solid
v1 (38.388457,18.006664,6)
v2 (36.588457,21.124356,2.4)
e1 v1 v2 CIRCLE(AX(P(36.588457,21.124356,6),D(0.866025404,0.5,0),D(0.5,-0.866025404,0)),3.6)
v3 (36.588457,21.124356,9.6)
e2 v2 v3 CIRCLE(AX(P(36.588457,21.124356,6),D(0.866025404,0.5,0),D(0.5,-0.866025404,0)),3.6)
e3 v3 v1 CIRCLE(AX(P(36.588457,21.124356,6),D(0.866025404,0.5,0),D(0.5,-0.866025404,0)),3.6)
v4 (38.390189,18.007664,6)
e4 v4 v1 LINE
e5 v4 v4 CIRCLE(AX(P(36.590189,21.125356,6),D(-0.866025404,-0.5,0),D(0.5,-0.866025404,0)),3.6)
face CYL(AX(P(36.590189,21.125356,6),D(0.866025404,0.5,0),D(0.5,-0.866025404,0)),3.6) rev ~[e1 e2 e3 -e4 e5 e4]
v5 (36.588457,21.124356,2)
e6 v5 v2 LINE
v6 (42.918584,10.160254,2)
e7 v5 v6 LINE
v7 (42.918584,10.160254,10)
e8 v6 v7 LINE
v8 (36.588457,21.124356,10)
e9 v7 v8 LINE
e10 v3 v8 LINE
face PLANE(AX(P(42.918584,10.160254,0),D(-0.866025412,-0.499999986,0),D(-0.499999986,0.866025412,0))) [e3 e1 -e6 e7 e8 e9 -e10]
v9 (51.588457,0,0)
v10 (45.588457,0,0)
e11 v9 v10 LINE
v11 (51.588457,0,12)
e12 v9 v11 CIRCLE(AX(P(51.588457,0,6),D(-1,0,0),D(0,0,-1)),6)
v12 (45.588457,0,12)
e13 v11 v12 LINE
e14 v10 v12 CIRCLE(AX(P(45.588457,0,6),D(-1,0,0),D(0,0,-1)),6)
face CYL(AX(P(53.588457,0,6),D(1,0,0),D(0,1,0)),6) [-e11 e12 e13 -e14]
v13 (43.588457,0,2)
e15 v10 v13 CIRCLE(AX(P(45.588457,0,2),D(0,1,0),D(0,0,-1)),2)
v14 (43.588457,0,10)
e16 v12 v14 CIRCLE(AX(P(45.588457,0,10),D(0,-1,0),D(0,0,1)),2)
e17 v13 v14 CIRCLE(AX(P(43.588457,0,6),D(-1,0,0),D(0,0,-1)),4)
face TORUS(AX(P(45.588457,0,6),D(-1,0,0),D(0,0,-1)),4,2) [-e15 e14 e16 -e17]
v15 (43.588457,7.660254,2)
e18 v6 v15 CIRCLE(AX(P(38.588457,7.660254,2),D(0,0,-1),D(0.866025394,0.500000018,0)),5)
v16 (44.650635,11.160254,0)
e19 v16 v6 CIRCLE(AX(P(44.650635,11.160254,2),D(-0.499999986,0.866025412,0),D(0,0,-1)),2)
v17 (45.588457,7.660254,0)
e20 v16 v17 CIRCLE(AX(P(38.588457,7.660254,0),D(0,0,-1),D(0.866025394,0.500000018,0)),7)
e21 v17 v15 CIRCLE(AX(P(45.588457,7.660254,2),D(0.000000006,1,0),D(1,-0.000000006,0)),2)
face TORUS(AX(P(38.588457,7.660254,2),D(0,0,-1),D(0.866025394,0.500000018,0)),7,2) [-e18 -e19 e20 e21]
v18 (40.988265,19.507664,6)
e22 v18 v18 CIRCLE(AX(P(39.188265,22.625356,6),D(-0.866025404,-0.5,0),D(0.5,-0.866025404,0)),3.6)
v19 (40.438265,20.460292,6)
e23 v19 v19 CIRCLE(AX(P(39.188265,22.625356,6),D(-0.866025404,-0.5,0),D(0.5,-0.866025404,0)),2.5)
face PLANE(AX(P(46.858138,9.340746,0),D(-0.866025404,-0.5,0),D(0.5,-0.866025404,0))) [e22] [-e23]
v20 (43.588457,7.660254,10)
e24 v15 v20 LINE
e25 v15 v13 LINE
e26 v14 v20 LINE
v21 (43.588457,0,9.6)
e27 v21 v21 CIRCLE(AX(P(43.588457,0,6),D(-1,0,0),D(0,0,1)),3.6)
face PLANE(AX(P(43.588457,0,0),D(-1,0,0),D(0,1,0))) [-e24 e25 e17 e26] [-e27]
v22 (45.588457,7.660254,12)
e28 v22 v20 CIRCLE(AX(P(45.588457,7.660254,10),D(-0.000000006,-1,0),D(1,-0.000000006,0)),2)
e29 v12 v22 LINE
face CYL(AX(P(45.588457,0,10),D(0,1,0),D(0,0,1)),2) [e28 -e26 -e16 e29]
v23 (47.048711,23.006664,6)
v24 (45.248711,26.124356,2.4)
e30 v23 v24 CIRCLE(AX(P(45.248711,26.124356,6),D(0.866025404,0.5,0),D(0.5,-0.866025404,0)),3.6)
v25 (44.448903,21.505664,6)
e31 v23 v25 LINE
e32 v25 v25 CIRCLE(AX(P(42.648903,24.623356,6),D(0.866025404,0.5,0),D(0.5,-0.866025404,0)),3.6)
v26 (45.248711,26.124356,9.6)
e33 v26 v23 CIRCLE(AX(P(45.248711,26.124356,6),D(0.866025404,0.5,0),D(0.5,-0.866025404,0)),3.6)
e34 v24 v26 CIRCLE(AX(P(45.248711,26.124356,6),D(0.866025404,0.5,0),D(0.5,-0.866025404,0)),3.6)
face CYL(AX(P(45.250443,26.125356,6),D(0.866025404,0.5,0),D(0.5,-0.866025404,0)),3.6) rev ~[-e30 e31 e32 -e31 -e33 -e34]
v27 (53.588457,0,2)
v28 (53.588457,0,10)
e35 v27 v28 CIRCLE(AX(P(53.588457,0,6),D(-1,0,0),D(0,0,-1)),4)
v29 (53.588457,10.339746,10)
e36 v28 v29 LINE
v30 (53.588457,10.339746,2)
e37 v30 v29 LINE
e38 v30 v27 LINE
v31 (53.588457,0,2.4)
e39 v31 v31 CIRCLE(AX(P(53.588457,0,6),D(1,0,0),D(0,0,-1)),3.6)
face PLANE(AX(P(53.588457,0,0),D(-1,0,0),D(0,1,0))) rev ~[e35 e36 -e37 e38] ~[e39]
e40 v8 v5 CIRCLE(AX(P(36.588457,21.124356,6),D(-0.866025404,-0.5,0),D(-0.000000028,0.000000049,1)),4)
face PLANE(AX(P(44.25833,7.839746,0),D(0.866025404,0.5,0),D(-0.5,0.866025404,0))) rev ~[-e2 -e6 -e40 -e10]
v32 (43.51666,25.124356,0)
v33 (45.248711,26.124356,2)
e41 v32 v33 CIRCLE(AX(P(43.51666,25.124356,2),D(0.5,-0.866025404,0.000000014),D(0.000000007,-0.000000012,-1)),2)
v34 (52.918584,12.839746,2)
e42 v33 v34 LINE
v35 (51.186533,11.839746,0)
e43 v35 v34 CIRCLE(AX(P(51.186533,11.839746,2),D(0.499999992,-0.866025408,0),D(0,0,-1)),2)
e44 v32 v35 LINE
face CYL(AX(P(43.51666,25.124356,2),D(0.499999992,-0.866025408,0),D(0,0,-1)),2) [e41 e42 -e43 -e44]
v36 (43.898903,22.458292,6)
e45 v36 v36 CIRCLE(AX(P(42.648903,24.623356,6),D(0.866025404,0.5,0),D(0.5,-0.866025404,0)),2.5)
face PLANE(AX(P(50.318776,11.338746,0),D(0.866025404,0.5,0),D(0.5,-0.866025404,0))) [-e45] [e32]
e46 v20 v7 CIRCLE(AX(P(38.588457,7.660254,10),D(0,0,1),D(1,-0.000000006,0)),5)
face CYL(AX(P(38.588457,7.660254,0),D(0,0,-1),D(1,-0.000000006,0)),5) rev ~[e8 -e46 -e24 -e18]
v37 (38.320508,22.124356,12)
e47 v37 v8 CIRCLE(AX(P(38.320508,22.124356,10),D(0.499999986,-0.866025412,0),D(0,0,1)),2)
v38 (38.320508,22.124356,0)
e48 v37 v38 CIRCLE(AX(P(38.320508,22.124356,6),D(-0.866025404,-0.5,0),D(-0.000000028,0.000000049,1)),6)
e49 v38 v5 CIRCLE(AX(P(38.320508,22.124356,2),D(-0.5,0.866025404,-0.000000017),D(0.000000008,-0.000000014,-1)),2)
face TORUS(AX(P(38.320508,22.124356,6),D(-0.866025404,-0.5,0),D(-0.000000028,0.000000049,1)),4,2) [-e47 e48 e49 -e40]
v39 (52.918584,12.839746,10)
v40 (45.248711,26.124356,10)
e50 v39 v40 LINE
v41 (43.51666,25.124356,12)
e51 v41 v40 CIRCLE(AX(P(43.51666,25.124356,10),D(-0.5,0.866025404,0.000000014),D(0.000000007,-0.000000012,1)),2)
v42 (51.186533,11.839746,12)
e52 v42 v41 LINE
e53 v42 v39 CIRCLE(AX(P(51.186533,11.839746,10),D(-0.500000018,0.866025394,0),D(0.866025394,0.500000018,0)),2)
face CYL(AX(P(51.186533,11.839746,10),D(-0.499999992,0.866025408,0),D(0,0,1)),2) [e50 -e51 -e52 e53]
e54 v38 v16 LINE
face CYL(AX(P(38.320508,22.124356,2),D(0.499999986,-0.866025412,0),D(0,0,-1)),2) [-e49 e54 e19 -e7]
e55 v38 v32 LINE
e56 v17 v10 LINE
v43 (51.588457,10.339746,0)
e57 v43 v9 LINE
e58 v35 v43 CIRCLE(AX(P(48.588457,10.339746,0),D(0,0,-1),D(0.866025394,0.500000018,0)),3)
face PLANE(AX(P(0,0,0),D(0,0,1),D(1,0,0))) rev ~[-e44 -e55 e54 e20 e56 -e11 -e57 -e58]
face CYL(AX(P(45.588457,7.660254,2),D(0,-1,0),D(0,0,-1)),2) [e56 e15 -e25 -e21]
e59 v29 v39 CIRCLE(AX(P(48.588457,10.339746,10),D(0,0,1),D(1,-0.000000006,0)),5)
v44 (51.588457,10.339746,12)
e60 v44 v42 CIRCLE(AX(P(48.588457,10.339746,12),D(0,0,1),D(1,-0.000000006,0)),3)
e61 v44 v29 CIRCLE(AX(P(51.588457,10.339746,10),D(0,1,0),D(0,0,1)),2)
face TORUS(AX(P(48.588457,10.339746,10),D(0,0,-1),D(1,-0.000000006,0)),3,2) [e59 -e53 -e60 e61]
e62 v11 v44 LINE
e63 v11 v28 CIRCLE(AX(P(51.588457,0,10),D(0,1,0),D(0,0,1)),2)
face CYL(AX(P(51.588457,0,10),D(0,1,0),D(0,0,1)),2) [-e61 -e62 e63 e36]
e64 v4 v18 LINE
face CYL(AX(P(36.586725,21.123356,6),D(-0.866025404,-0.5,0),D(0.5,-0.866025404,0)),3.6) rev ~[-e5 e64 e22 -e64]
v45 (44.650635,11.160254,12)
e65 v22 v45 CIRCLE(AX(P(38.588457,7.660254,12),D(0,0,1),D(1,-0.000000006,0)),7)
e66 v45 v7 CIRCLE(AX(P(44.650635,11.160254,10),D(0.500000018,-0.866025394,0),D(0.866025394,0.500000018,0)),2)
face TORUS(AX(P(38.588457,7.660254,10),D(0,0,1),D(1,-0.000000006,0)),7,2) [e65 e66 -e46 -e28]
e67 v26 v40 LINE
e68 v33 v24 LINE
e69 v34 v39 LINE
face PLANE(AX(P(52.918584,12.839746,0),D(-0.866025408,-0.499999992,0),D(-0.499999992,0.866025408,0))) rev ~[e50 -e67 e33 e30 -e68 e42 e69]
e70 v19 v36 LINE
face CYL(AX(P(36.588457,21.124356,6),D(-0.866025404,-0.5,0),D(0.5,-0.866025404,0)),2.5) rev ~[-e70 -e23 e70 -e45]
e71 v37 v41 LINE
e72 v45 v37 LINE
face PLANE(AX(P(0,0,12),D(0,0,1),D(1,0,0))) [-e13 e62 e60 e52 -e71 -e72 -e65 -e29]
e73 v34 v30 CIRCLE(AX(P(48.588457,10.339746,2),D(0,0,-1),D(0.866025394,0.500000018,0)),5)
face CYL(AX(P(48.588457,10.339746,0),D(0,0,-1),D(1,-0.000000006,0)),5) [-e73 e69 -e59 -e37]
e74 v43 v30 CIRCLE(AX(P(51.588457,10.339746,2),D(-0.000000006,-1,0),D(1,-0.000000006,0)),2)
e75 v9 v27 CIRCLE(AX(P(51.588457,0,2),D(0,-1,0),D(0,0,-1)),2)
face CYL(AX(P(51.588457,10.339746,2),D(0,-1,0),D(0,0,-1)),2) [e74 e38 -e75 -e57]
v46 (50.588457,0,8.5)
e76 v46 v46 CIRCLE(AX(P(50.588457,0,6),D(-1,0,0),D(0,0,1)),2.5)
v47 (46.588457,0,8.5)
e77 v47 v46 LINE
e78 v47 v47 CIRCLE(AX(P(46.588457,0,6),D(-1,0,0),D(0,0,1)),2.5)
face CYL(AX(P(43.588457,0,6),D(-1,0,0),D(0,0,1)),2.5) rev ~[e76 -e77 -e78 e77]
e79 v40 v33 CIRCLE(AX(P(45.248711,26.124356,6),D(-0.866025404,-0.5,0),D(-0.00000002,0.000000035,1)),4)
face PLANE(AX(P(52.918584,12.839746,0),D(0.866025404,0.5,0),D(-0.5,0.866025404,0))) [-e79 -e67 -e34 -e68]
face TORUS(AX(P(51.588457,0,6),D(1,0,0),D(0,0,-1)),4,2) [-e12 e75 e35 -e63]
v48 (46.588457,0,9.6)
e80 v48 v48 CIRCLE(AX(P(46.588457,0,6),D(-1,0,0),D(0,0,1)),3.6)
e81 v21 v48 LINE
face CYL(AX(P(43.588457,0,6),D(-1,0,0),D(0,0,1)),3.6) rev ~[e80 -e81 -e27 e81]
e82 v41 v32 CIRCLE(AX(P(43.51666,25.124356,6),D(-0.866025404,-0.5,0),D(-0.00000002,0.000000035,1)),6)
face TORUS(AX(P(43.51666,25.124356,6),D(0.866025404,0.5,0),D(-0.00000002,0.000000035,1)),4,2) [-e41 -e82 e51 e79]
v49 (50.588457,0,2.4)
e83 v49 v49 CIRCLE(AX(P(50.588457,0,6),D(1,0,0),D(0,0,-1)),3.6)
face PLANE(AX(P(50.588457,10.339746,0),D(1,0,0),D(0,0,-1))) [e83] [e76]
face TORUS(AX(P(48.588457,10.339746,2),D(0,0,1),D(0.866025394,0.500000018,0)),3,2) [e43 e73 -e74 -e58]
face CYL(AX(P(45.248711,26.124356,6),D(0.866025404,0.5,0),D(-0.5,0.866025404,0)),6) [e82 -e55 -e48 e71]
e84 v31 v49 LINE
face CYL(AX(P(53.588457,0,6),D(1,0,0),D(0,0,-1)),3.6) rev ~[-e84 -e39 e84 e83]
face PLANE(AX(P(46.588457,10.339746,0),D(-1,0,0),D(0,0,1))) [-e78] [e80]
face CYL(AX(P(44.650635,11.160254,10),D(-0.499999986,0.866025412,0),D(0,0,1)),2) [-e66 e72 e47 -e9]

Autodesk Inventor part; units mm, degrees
ref_plane "YZ Plane" through (0, 0, 0) normal (1, 0, 0) x (0, 1, 0)
sketch "Sketch1" plane through (0, 0, 0) normal (0, 0, 1) x (1, 0, 0)
  line L0 (53.588457, 0) -> (0, 0)
  line L1 (0, 0) -> (60.328682, 34.830781)
  line L2 (43.588457, 0) -> (43.588457, 7.660254)
  line L3 (42.918584, 10.160254) -> (36.588457, 21.124356)
  line L4 (53.588457, 0) -> (53.588457, 10.339746)
  line L5 (52.918584, 12.839746) -> (45.248711, 26.124356)
  arc A0 (43.588457, 7.660254) -> (42.918584, 10.160254) centre (38.588457, 7.660254) ccw
  arc A1 (53.588457, 10.339746) -> (52.918584, 12.839746) centre (48.588457, 10.339746) ccw
  line L6 (45.248711, 26.124356) -> (36.588457, 21.124356)
  line L7 (45.248711, 26.124356) -> (52.918584, 12.839746)
  line L8 (36.588457, 21.124356) -> (42.918584, 10.160254)
  line L9 (43.588457, 0) -> (53.588457, 0)
  line L10 (53.588457, 0) -> (53.588457, 10.339746)
  line L11 (43.588457, 0) -> (53.588457, 0)
  line L12 (53.588457, 0) -> (53.588457, 10.339746)
  line L13 (52.918584, 12.839746) -> (45.248711, 26.124356)
  line L14 (45.248711, 26.124356) -> (36.588457, 21.124356)
  line L15 (36.588457, 21.124356) -> (42.918584, 10.160254)
  line L16 (43.588457, 7.660254) -> (43.588457, 0)
  point P0 (43.30127, 25)
  point P1 (43.588457, 9)
  dimension "d37" = 30
  dimension "d38" = 10
  dimension "d39" = 10
  dimension "d40" = 0
  dimension "d41" = 0
  dimension "d42" = 9
  dimension "d43" = 14
  dimension "d44" = 150
  dimension "d45" = 5
extrude "Extrusion1" add sketch "Sketch1" along normal blind 12 contours L0 L2 A0 L3 L1 L5 A1 L4
ref_plane "Work Plane1" through (52.918584, 12.839746, 0) normal (0.8660254, 0.5, 0) x (-0.5, 0.8660254, 0)
sketch "Sketch2" plane through (52.918584, 12.839746, 0) normal (0.8660254, 0.5, 0) x (-0.5, 0.8660254, 0)
  circle A0 centre (15.339746, 6) radius 6
  line L0 (15.339746, 0) -> (15.339746, 12)
  line L1 (0, 12) -> (15.339746, 12)
  dimension "d5" = 12
  dimension "d47" = 0
  dimension "d48" = 6
extrude "Extrusion2" add sketch "Sketch2" against normal blind 10
ref_plane "Work Plane2" through (53.588457, 10.339746, 0) normal (1, 0, 0) x (0, 1, 0)
sketch "Sketch3" plane through (53.588457, 10.339746, 0) normal (1, 0, 0) x (0, 1, 0)
  circle A0 centre (-10.339746, 6) radius 6
  line L0 (-10.339746, 0) -> (-10.339746, 12)
  line L1 (-10.339746, 0) -> (0, 0)
  point P0 (43.30127, 10)
  point P1 (10.78461, 12)
  dimension "d10" = 12
  dimension "d49" = 0
  dimension "d50" = 6
extrude "Extrusion3" add sketch "Sketch3" against normal blind 10
sketch "Sketch4" plane through (44.25833, 7.839746, 0) normal (-0.8660254, -0.5, 0) x (0.5, -0.8660254, 0)
  circle A0 centre (-15.339746, 6) radius 2.5
  circle A1 centre (-15.339746, 6) radius 6
  point P0 (-15.339746, 0)
  point P1 (-15.339746, 12)
  dimension "d15" = 5
extrude "Extrusion4" cut sketch "Sketch4" along normal through all both and the other way through all contours A0
sketch "Sketch5" plane through (43.588457, 10.339746, 0) normal (-1, 0, 0) x (0, 0, 1)
  circle A0 centre (6, -10.339746) radius 2.5
  arc A1 (0, -10.339746) -> (12, -10.339746) centre (6, -10.339746) ccw
  dimension "d18" = 5
extrude "Extrusion5" cut sketch "Sketch5" along normal through all both and the other way through all
sketch "Sketch6" plane through (52.918584, 12.839746, 0) normal (0.8660254, 0.5, 0) x (0.5, -0.8660254, 0)
  circle A0 centre (-15.339746, -6) radius 3.6
  circle A1 centre (-15.339746, -6) radius 2.5
  arc A2 (-15.339746, 0) -> (-15.339746, 0) centre (-15.339746, -6) ccw
  point P0 (0, -10)
  dimension "d21" = 5
  dimension "d22" = 7.2
extrude "Extrusion6" cut sketch "Sketch6" against normal blind 3 contours A0
sketch "Sketch7" plane through (44.25833, 7.839746, 0) normal (-0.8660254, -0.5, 0) x (0.5, -0.8660254, 0)
  circle A0 centre (-15.339746, 6) radius 3.6
  circle A1 centre (-15.339746, 6) radius 2.5
  arc A2 (-12.839746, 6) -> (-12.839746, 6) centre (-15.339746, 6) ccw
  point P0 (-15.339746, 0)
  dimension "d25" = 5
  dimension "d26" = 7.2
extrude "Extrusion7" cut sketch "Sketch7" along normal mid plane 6
sketch "Sketch8" plane through (43.588457, 10.339746, 0) normal (-1, 0, 0) x (0, 0, 1)
  circle A0 centre (6, -10.339746) radius 3.6
  circle A1 centre (6, -10.339746) radius 2.5
  arc A2 (8.5, -10.339746) -> (8.5, -10.339746) centre (6, -10.339746) ccw
  point P0 (0, -10.339746)
  dimension "d29" = 7.2
  dimension "d30" = 5
extrude "Extrusion8" cut sketch "Sketch8" along normal mid plane 6
sketch "Sketch9" plane through (53.588457, 10.339746, 0) normal (1, 0, 0) x (0, 0, -1)
  circle A0 centre (-6, -10.339746) radius 3.6
  circle A1 centre (-6, -10.339746) radius 2.5
  circle A2 centre (-6, -10.339746) radius 2.5
  point P0 (0, -10.339746)
  dimension "d33" = 5
  dimension "d34" = 7.2
extrude "Extrusion9" cut sketch "Sketch9" against normal blind 3
fillet "Fillet1" radius 2 16 edges at (42.2487, 31.3205, 6) (49.0836, 19.4821, 0) (53.4181, 11.6338, 0) (53.5885, 5.1699, 0) (53.5885, -6, 6) (53.5885, 5.1699, 12) (53.4181, 11.6338, 12) (49.0836, 19.4821, 12) (43.4181, 8.9543, 12) (43.5885, 3.8301, 12) (43.5885, -6, 6) (43.5885, 3.8301, 0) (43.4181, 8.9543, 0) (39.7535, 15.6423, 0) (33.5885, 26.3205, 6) (39.7535, 15.6423, 12)
equation "\"d38\" = d46"
equation "\"d39\" = d46"
equation "\"d3\" = width"
equation "\"d5\" = width"
equation "\"d48\" = 0.5 * width"
equation "\"d8\" = thickness"
equation "\"d10\" = width"
equation "\"d50\" = 0.5 * width"
equation "\"d13\" = thickness"
equation "\"thickness\" = 10"
equation "\"width\" = 12"
equation "\"d46\" = 10"
properties part number "Link2"
